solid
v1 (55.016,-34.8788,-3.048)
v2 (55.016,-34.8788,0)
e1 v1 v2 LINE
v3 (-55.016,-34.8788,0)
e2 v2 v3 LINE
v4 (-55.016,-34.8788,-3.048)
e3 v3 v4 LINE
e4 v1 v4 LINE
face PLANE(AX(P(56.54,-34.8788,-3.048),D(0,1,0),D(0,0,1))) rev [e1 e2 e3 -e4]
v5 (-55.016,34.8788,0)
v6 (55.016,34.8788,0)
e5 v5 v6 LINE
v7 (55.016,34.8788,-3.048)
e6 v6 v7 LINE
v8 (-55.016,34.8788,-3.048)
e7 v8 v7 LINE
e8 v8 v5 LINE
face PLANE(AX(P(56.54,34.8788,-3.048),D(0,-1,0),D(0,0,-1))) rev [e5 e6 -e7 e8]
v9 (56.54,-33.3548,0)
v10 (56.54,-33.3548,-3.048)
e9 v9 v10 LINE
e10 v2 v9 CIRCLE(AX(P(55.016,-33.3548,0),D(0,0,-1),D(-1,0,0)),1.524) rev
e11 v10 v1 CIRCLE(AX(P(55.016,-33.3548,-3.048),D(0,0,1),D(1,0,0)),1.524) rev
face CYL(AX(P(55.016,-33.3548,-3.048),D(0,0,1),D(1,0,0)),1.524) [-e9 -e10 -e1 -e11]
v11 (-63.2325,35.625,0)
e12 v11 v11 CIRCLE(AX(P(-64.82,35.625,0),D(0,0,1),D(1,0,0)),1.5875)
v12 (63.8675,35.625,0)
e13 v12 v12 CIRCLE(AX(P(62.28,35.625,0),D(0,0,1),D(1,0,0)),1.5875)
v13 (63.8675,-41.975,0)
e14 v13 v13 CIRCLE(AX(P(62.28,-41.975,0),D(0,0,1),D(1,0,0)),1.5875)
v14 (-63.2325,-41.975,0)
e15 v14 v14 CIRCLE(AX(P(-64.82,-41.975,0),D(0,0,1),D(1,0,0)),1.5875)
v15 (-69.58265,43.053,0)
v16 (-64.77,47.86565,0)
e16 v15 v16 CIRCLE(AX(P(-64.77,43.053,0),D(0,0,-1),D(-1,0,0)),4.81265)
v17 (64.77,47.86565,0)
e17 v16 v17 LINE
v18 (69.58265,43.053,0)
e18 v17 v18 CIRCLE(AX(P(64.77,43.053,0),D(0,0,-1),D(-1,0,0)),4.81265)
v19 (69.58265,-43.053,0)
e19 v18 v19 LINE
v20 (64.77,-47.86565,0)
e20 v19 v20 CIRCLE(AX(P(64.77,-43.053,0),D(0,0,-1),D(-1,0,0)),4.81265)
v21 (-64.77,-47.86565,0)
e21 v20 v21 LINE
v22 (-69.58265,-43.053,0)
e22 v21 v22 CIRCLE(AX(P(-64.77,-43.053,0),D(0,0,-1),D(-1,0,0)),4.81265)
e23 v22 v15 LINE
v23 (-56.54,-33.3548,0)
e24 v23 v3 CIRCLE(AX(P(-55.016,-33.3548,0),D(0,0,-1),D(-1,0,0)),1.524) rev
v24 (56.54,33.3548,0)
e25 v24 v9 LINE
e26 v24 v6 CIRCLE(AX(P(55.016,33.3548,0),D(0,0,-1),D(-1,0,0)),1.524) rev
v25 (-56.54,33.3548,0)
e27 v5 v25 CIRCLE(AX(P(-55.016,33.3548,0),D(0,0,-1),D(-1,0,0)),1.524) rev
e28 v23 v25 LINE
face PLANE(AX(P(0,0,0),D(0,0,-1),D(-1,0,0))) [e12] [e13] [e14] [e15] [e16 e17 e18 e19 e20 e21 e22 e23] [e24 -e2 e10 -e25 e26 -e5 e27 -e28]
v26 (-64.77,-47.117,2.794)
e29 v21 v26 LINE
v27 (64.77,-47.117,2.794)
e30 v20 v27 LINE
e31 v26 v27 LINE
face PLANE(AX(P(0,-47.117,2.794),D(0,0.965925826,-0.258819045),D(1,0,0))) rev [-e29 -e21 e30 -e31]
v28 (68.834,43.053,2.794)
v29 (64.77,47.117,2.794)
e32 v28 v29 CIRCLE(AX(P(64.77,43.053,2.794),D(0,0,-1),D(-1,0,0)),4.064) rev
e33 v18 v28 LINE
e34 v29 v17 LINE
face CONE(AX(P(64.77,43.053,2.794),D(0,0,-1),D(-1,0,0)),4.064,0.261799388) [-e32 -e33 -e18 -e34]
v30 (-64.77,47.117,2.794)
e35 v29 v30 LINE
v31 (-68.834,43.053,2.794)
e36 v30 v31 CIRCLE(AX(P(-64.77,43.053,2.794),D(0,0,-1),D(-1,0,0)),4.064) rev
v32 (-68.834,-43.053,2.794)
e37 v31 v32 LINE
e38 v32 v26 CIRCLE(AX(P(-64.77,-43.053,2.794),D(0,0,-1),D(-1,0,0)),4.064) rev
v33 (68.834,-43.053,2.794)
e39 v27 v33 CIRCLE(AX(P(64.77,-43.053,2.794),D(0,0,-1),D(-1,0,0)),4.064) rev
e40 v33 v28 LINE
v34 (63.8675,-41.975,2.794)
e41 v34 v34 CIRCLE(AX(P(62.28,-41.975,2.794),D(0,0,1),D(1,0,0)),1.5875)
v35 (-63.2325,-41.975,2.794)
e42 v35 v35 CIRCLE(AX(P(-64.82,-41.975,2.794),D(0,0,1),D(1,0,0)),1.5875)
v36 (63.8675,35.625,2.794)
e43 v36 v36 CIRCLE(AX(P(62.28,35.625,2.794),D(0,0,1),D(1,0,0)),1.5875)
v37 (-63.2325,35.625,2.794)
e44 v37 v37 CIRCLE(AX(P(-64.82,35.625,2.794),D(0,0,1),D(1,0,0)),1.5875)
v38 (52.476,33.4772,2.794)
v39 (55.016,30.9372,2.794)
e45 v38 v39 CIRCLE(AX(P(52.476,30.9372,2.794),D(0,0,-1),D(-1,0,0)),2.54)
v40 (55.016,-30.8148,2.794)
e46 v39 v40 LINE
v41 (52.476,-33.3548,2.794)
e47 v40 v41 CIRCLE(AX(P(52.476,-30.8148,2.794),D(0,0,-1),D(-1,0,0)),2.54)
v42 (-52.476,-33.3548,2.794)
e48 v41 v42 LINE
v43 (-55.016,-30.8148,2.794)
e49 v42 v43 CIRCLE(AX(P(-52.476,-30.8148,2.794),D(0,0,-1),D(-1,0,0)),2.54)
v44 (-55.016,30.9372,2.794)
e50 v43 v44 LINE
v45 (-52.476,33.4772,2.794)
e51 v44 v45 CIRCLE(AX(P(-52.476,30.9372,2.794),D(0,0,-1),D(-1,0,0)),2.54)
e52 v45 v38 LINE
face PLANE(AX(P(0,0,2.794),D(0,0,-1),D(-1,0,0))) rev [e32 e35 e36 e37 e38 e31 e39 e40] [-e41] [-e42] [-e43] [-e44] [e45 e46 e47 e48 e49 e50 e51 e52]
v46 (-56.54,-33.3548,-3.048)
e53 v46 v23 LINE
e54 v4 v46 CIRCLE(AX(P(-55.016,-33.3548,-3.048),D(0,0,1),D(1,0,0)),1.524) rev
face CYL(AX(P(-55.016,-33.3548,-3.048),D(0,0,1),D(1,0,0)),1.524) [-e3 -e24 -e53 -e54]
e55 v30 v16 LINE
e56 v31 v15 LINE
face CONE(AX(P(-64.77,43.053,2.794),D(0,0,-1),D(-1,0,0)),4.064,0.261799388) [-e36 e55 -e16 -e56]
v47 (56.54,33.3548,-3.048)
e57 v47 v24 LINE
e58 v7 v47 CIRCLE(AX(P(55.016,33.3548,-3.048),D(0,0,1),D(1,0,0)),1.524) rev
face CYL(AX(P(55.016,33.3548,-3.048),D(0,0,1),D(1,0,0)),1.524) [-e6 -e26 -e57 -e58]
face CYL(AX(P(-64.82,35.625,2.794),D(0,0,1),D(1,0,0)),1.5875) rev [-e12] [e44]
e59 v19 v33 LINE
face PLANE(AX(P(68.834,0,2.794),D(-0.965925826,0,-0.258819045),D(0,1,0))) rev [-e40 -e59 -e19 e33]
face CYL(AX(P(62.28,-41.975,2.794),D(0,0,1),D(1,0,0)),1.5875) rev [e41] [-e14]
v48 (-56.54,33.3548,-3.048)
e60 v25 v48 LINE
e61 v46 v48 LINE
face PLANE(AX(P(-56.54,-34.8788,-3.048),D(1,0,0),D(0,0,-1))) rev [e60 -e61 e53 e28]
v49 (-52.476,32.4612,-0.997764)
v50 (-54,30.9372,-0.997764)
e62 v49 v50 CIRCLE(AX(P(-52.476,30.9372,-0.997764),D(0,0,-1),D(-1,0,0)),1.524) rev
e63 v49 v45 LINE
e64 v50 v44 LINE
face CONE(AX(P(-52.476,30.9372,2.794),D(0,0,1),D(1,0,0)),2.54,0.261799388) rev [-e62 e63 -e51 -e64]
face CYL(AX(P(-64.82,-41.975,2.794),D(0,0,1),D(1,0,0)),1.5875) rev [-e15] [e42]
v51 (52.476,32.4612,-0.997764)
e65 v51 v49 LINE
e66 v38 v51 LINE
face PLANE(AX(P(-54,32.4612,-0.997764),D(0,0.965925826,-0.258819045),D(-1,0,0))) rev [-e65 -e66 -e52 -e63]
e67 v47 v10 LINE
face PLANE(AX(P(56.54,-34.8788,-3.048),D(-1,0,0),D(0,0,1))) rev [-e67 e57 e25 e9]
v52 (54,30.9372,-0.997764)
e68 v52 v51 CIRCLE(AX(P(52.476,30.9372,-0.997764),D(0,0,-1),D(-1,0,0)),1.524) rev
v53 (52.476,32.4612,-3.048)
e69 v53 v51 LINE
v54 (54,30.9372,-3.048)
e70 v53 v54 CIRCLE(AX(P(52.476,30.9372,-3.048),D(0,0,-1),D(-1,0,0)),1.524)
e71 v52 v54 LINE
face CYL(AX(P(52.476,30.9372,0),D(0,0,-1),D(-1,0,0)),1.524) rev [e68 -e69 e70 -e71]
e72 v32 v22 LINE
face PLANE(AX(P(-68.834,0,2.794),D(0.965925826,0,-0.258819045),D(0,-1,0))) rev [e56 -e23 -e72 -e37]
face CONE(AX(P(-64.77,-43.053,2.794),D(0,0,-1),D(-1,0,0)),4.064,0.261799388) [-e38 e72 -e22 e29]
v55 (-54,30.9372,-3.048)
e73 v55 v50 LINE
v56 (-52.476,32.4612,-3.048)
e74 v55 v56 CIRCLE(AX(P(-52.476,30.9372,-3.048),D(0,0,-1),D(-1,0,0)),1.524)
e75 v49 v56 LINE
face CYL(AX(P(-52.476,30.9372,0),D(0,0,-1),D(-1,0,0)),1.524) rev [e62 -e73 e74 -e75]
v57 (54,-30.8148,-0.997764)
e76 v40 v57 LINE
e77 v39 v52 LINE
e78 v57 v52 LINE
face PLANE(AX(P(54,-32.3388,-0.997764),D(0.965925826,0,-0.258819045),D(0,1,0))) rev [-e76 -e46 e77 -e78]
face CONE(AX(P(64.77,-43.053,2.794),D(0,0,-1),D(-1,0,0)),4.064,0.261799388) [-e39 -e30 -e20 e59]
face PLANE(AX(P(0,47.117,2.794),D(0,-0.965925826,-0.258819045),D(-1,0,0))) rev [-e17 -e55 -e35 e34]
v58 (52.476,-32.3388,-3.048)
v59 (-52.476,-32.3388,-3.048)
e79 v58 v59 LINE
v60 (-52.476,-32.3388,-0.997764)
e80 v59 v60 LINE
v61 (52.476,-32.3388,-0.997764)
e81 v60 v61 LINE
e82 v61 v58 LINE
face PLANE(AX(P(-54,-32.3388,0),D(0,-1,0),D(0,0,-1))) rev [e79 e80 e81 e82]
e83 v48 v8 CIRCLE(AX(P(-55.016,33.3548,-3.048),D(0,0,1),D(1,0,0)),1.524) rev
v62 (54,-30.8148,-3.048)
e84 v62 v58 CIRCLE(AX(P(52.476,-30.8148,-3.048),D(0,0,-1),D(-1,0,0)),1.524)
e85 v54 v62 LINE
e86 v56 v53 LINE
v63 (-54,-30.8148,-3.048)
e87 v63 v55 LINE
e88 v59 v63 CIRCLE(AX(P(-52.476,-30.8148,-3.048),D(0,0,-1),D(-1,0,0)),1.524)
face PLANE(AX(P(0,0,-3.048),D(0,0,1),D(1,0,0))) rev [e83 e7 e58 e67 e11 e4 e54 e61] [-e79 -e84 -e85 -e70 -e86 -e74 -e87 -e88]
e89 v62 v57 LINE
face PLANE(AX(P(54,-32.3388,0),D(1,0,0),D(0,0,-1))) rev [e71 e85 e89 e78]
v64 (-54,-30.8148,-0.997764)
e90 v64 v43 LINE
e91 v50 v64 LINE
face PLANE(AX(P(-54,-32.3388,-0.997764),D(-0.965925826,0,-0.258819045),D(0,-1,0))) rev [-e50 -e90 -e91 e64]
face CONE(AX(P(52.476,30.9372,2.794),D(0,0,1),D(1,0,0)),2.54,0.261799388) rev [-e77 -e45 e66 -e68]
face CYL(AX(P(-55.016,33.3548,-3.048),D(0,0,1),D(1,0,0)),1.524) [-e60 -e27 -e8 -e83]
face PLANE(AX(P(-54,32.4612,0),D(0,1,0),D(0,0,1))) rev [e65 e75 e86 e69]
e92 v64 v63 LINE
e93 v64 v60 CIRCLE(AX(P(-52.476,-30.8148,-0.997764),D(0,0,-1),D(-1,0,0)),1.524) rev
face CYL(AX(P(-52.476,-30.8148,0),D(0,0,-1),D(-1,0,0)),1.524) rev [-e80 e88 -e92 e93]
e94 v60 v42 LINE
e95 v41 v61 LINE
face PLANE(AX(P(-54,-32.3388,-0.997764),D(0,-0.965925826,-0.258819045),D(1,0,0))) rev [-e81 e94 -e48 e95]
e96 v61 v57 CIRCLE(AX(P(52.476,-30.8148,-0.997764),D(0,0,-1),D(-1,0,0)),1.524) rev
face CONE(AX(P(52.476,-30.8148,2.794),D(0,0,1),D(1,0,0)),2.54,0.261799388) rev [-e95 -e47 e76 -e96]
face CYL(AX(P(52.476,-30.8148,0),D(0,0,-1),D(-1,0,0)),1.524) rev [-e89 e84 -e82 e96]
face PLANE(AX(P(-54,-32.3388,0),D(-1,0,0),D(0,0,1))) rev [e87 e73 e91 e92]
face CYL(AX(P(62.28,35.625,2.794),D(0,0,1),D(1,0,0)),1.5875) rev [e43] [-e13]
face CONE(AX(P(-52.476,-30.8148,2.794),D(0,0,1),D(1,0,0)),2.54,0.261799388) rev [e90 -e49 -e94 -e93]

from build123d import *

# Parameters (mm, degrees)
SKETCH1_W                    = 139.7
SKETCH1_H                    = 96.266
BOSS_EXTRUDE1_DEPTH          = 2.794
F_1_8_0_125_DIAMETER_HOLE1_D = 3.175
SKETCH4_W                    = 107.9999999
SKETCH4_H                    = 64.79999994
CUT_EXTRUDE1_DEPTH           = 85.874110452
FILLET1_R                    = 1.524
FILLET2_R                    = 5.08
BOSS_EXTRUDE2_START          = 3.048
SKETCH5_W                    = 113.0799999
SKETCH5_H                    = 69.75759988
BOSS_EXTRUDE2_DEPTH          = 3.048
FILLET3_R                    = 1.524
CHAMFER1_SIZE                = 1.016
CHAMFER1_SIZE2               = 3.79176362
CHAMFER2_SIZE                = 1.016
CHAMFER2_SIZE_2              = 3.79176362


with BuildPart() as part:
    # Sketch1 → Boss-Extrude1 (new body)
    with BuildSketch(Plane.XY):
        Rectangle(SKETCH1_W, SKETCH1_H)
    extrude(amount=BOSS_EXTRUDE1_DEPTH)

    # 1/8 (0.125) Diameter Hole1 (through all)
    with Locations(Plane.XY.offset(2.794)):
        with Locations((-64.82, -41.975), (-64.82, 35.625), (62.28, -41.975), (62.28, 35.625)):
            Hole(F_1_8_0_125_DIAMETER_HOLE1_D / 2)

    # Sketch4 → Cut-Extrude1 (cut, through all)
    with BuildSketch(Plane.XY.offset(2.794)):
        with Locations((0, 0.06120003)):
            Rectangle(SKETCH4_W, SKETCH4_H)
    extrude(amount=-CUT_EXTRUDE1_DEPTH, mode=Mode.SUBTRACT)

    # Fillet1
    fillet1_edges = [part.edges().sort_by_distance(p)[0] for p in [
        (53.99999995, 32.4612, 1.397),
        (53.99999995, -32.33879994, 1.397),
        (-53.99999995, -32.33879994, 1.397),
        (-53.99999995, 32.4612, 1.397),
    ]]
    fillet(fillet1_edges, radius=FILLET1_R)

    # Fillet2
    fillet2_edges = [part.edges().sort_by_distance(p)[0] for p in [
        (69.85, -48.133, 1.397),
        (-69.85, -48.133, 1.397),
        (-69.85, 48.133, 1.397),
        (69.85, 48.133, 1.397),
    ]]
    fillet(fillet2_edges, radius=FILLET2_R)

    # Sketch5 → Boss-Extrude2 (add)
    with BuildSketch(Plane(origin=(0, 0, 0), x_dir=(-1, 0, 0), z_dir=(0, 0, -1)).offset(BOSS_EXTRUDE2_START)):
        Rectangle(SKETCH5_W, SKETCH5_H)
        with BuildLine():
            Line((-53.99999995, -30.81479994), (-53.99999995, 30.9372))
            ThreePointArc((-53.99999995, 30.9372), (-53.553630685, 32.014830735), (-52.47599995, 32.4612))
            Line((-52.47599995, 32.4612), (52.47599995, 32.4612))
            ThreePointArc((52.47599995, 32.4612), (53.553630685, 32.014830735), (53.99999995, 30.9372))
            Line((53.99999995, 30.9372), (53.99999995, -30.81479994))
            ThreePointArc((53.99999995, -30.81479994), (53.553630685, -31.892430675), (52.47599995, -32.33879994))
            Line((52.47599995, -32.33879994), (-52.47599995, -32.33879994))
            ThreePointArc((-52.47599995, -32.33879994), (-53.553630685, -31.892430675), (-53.99999995, -30.81479994))
        make_face(mode=Mode.SUBTRACT)
    extrude(amount=-BOSS_EXTRUDE2_DEPTH)

    # Fillet3
    fillet3_edges = [part.edges().sort_by_distance(p)[0] for p in [
        (-56.53999995, -34.87879994, -1.524),
        (-56.53999995, 34.87879994, -1.524),
        (56.53999995, 34.87879994, -1.524),
        (56.53999995, -34.87879994, -1.524),
    ]]
    fillet(fillet3_edges, radius=FILLET3_R)

    # Chamfer1
    chamfer1_edges = [part.edges().sort_by_distance(p)[0] for p in [
        (0, -32.33879994, 2.794),
        (-53.99999995, 0.06120003, 2.794),
        (53.99999995, 0.06120003, 2.794),
        (0, 32.4612, 2.794),
        (-53.553630685, -31.892430675, 2.794),
        (53.553630685, -31.892430675, 2.794),
        (53.553630685, 32.014830735, 2.794),
        (-53.553630685, 32.014830735, 2.794),
    ]]
    chamfer1_side = [part.faces().sort_by_distance(p)[0] for p in [
        (0, -46.436437807, 2.794),
    ]]
    chamfer(chamfer1_edges, length=CHAMFER1_SIZE, length2=CHAMFER1_SIZE2, reference=chamfer1_side[0])

    # Chamfer2
    # the kernel refuses this chamfer: 3.79176362, 1.016 mm, written as the material it takes off along each edge
    with BuildSketch(Plane(origin=(-69.85, 43.053, 2.794), x_dir=(0.9905000388259543, 0, 0.13751244702129017), z_dir=(0, -1, 0)), Plane(origin=(69.85, -43.053, 2.794), x_dir=(-0.9905000388259543, 0, 0.13751244702129017), z_dir=(0, 1, 0))) as chamfer2_piece_1:
        Polygon((CHAMFER2_SIZE * 0.990500038826, -CHAMFER2_SIZE * 0.137512447021), (-CHAMFER2_SIZE_2 * 0.137512447039, -CHAMFER2_SIZE_2 * 0.990500038954), (0, 0), align=None)
    extrude(amount=86.106, mode=Mode.SUBTRACT)
    with BuildSketch(Plane(origin=(-64.77, -43.053, 2.794), x_dir=(0, -1, 0), z_dir=(1, 0, 0))) as chamfer2_piece_2:
        Polygon((5.08 - CHAMFER2_SIZE, 0), (5.08, CHAMFER2_SIZE_2), (5.08, 0), align=None)
    revolve(axis=Axis((-64.77, -43.053, 2.794), (0, 0, -1)), revolution_arc=90, mode=Mode.SUBTRACT)
    with BuildSketch(Plane(origin=(-64.77, -48.133, 2.794), x_dir=(0, 0.990500038825954, 0.13751244702129148), z_dir=(1, 0, 0)), Plane(origin=(64.77, 48.133, 2.794), x_dir=(0, -0.990500038825954, 0.13751244702129148), z_dir=(-1, 0, 0))) as chamfer2_piece_3:
        Polygon((CHAMFER2_SIZE * 0.990500038826, -CHAMFER2_SIZE * 0.137512447021), (-CHAMFER2_SIZE_2 * 0.137512447039, -CHAMFER2_SIZE_2 * 0.990500038954), (0, 0), align=None)
    extrude(amount=129.54, mode=Mode.SUBTRACT)
    with BuildSketch(Plane(origin=(64.77, -43.053, 2.794), x_dir=(0, -1, 0), z_dir=(-1, 0, 0))) as chamfer2_piece_4:
        Polygon((5.08 - CHAMFER2_SIZE, 0), (5.08, -CHAMFER2_SIZE_2), (5.08, 0), align=None)
    revolve(axis=Axis((64.77, -43.053, 2.794), (0, 0, 1)), revolution_arc=90, mode=Mode.SUBTRACT)
    with BuildSketch(Plane(origin=(64.77, 43.053, 2.794), x_dir=(1, 0, 0), z_dir=(0, -1, 0))) as chamfer2_piece_5:
        Polygon((5.08 - CHAMFER2_SIZE, 0), (5.08, -CHAMFER2_SIZE_2), (5.08, 0), align=None)
    revolve(axis=Axis((64.77, 43.053, 2.794), (0, 0, 1)), revolution_arc=90, mode=Mode.SUBTRACT)
    with BuildSketch(Plane(origin=(-64.77, 43.053, 2.794), x_dir=(-1, 0, 0), z_dir=(0, -1, 0))) as chamfer2_piece_6:
        Polygon((5.08 - CHAMFER2_SIZE, 0), (5.08, CHAMFER2_SIZE_2), (5.08, 0), align=None)
    revolve(axis=Axis((-64.77, 43.053, 2.794), (0, 0, -1)), revolution_arc=90, mode=Mode.SUBTRACT)


solid = part.part
